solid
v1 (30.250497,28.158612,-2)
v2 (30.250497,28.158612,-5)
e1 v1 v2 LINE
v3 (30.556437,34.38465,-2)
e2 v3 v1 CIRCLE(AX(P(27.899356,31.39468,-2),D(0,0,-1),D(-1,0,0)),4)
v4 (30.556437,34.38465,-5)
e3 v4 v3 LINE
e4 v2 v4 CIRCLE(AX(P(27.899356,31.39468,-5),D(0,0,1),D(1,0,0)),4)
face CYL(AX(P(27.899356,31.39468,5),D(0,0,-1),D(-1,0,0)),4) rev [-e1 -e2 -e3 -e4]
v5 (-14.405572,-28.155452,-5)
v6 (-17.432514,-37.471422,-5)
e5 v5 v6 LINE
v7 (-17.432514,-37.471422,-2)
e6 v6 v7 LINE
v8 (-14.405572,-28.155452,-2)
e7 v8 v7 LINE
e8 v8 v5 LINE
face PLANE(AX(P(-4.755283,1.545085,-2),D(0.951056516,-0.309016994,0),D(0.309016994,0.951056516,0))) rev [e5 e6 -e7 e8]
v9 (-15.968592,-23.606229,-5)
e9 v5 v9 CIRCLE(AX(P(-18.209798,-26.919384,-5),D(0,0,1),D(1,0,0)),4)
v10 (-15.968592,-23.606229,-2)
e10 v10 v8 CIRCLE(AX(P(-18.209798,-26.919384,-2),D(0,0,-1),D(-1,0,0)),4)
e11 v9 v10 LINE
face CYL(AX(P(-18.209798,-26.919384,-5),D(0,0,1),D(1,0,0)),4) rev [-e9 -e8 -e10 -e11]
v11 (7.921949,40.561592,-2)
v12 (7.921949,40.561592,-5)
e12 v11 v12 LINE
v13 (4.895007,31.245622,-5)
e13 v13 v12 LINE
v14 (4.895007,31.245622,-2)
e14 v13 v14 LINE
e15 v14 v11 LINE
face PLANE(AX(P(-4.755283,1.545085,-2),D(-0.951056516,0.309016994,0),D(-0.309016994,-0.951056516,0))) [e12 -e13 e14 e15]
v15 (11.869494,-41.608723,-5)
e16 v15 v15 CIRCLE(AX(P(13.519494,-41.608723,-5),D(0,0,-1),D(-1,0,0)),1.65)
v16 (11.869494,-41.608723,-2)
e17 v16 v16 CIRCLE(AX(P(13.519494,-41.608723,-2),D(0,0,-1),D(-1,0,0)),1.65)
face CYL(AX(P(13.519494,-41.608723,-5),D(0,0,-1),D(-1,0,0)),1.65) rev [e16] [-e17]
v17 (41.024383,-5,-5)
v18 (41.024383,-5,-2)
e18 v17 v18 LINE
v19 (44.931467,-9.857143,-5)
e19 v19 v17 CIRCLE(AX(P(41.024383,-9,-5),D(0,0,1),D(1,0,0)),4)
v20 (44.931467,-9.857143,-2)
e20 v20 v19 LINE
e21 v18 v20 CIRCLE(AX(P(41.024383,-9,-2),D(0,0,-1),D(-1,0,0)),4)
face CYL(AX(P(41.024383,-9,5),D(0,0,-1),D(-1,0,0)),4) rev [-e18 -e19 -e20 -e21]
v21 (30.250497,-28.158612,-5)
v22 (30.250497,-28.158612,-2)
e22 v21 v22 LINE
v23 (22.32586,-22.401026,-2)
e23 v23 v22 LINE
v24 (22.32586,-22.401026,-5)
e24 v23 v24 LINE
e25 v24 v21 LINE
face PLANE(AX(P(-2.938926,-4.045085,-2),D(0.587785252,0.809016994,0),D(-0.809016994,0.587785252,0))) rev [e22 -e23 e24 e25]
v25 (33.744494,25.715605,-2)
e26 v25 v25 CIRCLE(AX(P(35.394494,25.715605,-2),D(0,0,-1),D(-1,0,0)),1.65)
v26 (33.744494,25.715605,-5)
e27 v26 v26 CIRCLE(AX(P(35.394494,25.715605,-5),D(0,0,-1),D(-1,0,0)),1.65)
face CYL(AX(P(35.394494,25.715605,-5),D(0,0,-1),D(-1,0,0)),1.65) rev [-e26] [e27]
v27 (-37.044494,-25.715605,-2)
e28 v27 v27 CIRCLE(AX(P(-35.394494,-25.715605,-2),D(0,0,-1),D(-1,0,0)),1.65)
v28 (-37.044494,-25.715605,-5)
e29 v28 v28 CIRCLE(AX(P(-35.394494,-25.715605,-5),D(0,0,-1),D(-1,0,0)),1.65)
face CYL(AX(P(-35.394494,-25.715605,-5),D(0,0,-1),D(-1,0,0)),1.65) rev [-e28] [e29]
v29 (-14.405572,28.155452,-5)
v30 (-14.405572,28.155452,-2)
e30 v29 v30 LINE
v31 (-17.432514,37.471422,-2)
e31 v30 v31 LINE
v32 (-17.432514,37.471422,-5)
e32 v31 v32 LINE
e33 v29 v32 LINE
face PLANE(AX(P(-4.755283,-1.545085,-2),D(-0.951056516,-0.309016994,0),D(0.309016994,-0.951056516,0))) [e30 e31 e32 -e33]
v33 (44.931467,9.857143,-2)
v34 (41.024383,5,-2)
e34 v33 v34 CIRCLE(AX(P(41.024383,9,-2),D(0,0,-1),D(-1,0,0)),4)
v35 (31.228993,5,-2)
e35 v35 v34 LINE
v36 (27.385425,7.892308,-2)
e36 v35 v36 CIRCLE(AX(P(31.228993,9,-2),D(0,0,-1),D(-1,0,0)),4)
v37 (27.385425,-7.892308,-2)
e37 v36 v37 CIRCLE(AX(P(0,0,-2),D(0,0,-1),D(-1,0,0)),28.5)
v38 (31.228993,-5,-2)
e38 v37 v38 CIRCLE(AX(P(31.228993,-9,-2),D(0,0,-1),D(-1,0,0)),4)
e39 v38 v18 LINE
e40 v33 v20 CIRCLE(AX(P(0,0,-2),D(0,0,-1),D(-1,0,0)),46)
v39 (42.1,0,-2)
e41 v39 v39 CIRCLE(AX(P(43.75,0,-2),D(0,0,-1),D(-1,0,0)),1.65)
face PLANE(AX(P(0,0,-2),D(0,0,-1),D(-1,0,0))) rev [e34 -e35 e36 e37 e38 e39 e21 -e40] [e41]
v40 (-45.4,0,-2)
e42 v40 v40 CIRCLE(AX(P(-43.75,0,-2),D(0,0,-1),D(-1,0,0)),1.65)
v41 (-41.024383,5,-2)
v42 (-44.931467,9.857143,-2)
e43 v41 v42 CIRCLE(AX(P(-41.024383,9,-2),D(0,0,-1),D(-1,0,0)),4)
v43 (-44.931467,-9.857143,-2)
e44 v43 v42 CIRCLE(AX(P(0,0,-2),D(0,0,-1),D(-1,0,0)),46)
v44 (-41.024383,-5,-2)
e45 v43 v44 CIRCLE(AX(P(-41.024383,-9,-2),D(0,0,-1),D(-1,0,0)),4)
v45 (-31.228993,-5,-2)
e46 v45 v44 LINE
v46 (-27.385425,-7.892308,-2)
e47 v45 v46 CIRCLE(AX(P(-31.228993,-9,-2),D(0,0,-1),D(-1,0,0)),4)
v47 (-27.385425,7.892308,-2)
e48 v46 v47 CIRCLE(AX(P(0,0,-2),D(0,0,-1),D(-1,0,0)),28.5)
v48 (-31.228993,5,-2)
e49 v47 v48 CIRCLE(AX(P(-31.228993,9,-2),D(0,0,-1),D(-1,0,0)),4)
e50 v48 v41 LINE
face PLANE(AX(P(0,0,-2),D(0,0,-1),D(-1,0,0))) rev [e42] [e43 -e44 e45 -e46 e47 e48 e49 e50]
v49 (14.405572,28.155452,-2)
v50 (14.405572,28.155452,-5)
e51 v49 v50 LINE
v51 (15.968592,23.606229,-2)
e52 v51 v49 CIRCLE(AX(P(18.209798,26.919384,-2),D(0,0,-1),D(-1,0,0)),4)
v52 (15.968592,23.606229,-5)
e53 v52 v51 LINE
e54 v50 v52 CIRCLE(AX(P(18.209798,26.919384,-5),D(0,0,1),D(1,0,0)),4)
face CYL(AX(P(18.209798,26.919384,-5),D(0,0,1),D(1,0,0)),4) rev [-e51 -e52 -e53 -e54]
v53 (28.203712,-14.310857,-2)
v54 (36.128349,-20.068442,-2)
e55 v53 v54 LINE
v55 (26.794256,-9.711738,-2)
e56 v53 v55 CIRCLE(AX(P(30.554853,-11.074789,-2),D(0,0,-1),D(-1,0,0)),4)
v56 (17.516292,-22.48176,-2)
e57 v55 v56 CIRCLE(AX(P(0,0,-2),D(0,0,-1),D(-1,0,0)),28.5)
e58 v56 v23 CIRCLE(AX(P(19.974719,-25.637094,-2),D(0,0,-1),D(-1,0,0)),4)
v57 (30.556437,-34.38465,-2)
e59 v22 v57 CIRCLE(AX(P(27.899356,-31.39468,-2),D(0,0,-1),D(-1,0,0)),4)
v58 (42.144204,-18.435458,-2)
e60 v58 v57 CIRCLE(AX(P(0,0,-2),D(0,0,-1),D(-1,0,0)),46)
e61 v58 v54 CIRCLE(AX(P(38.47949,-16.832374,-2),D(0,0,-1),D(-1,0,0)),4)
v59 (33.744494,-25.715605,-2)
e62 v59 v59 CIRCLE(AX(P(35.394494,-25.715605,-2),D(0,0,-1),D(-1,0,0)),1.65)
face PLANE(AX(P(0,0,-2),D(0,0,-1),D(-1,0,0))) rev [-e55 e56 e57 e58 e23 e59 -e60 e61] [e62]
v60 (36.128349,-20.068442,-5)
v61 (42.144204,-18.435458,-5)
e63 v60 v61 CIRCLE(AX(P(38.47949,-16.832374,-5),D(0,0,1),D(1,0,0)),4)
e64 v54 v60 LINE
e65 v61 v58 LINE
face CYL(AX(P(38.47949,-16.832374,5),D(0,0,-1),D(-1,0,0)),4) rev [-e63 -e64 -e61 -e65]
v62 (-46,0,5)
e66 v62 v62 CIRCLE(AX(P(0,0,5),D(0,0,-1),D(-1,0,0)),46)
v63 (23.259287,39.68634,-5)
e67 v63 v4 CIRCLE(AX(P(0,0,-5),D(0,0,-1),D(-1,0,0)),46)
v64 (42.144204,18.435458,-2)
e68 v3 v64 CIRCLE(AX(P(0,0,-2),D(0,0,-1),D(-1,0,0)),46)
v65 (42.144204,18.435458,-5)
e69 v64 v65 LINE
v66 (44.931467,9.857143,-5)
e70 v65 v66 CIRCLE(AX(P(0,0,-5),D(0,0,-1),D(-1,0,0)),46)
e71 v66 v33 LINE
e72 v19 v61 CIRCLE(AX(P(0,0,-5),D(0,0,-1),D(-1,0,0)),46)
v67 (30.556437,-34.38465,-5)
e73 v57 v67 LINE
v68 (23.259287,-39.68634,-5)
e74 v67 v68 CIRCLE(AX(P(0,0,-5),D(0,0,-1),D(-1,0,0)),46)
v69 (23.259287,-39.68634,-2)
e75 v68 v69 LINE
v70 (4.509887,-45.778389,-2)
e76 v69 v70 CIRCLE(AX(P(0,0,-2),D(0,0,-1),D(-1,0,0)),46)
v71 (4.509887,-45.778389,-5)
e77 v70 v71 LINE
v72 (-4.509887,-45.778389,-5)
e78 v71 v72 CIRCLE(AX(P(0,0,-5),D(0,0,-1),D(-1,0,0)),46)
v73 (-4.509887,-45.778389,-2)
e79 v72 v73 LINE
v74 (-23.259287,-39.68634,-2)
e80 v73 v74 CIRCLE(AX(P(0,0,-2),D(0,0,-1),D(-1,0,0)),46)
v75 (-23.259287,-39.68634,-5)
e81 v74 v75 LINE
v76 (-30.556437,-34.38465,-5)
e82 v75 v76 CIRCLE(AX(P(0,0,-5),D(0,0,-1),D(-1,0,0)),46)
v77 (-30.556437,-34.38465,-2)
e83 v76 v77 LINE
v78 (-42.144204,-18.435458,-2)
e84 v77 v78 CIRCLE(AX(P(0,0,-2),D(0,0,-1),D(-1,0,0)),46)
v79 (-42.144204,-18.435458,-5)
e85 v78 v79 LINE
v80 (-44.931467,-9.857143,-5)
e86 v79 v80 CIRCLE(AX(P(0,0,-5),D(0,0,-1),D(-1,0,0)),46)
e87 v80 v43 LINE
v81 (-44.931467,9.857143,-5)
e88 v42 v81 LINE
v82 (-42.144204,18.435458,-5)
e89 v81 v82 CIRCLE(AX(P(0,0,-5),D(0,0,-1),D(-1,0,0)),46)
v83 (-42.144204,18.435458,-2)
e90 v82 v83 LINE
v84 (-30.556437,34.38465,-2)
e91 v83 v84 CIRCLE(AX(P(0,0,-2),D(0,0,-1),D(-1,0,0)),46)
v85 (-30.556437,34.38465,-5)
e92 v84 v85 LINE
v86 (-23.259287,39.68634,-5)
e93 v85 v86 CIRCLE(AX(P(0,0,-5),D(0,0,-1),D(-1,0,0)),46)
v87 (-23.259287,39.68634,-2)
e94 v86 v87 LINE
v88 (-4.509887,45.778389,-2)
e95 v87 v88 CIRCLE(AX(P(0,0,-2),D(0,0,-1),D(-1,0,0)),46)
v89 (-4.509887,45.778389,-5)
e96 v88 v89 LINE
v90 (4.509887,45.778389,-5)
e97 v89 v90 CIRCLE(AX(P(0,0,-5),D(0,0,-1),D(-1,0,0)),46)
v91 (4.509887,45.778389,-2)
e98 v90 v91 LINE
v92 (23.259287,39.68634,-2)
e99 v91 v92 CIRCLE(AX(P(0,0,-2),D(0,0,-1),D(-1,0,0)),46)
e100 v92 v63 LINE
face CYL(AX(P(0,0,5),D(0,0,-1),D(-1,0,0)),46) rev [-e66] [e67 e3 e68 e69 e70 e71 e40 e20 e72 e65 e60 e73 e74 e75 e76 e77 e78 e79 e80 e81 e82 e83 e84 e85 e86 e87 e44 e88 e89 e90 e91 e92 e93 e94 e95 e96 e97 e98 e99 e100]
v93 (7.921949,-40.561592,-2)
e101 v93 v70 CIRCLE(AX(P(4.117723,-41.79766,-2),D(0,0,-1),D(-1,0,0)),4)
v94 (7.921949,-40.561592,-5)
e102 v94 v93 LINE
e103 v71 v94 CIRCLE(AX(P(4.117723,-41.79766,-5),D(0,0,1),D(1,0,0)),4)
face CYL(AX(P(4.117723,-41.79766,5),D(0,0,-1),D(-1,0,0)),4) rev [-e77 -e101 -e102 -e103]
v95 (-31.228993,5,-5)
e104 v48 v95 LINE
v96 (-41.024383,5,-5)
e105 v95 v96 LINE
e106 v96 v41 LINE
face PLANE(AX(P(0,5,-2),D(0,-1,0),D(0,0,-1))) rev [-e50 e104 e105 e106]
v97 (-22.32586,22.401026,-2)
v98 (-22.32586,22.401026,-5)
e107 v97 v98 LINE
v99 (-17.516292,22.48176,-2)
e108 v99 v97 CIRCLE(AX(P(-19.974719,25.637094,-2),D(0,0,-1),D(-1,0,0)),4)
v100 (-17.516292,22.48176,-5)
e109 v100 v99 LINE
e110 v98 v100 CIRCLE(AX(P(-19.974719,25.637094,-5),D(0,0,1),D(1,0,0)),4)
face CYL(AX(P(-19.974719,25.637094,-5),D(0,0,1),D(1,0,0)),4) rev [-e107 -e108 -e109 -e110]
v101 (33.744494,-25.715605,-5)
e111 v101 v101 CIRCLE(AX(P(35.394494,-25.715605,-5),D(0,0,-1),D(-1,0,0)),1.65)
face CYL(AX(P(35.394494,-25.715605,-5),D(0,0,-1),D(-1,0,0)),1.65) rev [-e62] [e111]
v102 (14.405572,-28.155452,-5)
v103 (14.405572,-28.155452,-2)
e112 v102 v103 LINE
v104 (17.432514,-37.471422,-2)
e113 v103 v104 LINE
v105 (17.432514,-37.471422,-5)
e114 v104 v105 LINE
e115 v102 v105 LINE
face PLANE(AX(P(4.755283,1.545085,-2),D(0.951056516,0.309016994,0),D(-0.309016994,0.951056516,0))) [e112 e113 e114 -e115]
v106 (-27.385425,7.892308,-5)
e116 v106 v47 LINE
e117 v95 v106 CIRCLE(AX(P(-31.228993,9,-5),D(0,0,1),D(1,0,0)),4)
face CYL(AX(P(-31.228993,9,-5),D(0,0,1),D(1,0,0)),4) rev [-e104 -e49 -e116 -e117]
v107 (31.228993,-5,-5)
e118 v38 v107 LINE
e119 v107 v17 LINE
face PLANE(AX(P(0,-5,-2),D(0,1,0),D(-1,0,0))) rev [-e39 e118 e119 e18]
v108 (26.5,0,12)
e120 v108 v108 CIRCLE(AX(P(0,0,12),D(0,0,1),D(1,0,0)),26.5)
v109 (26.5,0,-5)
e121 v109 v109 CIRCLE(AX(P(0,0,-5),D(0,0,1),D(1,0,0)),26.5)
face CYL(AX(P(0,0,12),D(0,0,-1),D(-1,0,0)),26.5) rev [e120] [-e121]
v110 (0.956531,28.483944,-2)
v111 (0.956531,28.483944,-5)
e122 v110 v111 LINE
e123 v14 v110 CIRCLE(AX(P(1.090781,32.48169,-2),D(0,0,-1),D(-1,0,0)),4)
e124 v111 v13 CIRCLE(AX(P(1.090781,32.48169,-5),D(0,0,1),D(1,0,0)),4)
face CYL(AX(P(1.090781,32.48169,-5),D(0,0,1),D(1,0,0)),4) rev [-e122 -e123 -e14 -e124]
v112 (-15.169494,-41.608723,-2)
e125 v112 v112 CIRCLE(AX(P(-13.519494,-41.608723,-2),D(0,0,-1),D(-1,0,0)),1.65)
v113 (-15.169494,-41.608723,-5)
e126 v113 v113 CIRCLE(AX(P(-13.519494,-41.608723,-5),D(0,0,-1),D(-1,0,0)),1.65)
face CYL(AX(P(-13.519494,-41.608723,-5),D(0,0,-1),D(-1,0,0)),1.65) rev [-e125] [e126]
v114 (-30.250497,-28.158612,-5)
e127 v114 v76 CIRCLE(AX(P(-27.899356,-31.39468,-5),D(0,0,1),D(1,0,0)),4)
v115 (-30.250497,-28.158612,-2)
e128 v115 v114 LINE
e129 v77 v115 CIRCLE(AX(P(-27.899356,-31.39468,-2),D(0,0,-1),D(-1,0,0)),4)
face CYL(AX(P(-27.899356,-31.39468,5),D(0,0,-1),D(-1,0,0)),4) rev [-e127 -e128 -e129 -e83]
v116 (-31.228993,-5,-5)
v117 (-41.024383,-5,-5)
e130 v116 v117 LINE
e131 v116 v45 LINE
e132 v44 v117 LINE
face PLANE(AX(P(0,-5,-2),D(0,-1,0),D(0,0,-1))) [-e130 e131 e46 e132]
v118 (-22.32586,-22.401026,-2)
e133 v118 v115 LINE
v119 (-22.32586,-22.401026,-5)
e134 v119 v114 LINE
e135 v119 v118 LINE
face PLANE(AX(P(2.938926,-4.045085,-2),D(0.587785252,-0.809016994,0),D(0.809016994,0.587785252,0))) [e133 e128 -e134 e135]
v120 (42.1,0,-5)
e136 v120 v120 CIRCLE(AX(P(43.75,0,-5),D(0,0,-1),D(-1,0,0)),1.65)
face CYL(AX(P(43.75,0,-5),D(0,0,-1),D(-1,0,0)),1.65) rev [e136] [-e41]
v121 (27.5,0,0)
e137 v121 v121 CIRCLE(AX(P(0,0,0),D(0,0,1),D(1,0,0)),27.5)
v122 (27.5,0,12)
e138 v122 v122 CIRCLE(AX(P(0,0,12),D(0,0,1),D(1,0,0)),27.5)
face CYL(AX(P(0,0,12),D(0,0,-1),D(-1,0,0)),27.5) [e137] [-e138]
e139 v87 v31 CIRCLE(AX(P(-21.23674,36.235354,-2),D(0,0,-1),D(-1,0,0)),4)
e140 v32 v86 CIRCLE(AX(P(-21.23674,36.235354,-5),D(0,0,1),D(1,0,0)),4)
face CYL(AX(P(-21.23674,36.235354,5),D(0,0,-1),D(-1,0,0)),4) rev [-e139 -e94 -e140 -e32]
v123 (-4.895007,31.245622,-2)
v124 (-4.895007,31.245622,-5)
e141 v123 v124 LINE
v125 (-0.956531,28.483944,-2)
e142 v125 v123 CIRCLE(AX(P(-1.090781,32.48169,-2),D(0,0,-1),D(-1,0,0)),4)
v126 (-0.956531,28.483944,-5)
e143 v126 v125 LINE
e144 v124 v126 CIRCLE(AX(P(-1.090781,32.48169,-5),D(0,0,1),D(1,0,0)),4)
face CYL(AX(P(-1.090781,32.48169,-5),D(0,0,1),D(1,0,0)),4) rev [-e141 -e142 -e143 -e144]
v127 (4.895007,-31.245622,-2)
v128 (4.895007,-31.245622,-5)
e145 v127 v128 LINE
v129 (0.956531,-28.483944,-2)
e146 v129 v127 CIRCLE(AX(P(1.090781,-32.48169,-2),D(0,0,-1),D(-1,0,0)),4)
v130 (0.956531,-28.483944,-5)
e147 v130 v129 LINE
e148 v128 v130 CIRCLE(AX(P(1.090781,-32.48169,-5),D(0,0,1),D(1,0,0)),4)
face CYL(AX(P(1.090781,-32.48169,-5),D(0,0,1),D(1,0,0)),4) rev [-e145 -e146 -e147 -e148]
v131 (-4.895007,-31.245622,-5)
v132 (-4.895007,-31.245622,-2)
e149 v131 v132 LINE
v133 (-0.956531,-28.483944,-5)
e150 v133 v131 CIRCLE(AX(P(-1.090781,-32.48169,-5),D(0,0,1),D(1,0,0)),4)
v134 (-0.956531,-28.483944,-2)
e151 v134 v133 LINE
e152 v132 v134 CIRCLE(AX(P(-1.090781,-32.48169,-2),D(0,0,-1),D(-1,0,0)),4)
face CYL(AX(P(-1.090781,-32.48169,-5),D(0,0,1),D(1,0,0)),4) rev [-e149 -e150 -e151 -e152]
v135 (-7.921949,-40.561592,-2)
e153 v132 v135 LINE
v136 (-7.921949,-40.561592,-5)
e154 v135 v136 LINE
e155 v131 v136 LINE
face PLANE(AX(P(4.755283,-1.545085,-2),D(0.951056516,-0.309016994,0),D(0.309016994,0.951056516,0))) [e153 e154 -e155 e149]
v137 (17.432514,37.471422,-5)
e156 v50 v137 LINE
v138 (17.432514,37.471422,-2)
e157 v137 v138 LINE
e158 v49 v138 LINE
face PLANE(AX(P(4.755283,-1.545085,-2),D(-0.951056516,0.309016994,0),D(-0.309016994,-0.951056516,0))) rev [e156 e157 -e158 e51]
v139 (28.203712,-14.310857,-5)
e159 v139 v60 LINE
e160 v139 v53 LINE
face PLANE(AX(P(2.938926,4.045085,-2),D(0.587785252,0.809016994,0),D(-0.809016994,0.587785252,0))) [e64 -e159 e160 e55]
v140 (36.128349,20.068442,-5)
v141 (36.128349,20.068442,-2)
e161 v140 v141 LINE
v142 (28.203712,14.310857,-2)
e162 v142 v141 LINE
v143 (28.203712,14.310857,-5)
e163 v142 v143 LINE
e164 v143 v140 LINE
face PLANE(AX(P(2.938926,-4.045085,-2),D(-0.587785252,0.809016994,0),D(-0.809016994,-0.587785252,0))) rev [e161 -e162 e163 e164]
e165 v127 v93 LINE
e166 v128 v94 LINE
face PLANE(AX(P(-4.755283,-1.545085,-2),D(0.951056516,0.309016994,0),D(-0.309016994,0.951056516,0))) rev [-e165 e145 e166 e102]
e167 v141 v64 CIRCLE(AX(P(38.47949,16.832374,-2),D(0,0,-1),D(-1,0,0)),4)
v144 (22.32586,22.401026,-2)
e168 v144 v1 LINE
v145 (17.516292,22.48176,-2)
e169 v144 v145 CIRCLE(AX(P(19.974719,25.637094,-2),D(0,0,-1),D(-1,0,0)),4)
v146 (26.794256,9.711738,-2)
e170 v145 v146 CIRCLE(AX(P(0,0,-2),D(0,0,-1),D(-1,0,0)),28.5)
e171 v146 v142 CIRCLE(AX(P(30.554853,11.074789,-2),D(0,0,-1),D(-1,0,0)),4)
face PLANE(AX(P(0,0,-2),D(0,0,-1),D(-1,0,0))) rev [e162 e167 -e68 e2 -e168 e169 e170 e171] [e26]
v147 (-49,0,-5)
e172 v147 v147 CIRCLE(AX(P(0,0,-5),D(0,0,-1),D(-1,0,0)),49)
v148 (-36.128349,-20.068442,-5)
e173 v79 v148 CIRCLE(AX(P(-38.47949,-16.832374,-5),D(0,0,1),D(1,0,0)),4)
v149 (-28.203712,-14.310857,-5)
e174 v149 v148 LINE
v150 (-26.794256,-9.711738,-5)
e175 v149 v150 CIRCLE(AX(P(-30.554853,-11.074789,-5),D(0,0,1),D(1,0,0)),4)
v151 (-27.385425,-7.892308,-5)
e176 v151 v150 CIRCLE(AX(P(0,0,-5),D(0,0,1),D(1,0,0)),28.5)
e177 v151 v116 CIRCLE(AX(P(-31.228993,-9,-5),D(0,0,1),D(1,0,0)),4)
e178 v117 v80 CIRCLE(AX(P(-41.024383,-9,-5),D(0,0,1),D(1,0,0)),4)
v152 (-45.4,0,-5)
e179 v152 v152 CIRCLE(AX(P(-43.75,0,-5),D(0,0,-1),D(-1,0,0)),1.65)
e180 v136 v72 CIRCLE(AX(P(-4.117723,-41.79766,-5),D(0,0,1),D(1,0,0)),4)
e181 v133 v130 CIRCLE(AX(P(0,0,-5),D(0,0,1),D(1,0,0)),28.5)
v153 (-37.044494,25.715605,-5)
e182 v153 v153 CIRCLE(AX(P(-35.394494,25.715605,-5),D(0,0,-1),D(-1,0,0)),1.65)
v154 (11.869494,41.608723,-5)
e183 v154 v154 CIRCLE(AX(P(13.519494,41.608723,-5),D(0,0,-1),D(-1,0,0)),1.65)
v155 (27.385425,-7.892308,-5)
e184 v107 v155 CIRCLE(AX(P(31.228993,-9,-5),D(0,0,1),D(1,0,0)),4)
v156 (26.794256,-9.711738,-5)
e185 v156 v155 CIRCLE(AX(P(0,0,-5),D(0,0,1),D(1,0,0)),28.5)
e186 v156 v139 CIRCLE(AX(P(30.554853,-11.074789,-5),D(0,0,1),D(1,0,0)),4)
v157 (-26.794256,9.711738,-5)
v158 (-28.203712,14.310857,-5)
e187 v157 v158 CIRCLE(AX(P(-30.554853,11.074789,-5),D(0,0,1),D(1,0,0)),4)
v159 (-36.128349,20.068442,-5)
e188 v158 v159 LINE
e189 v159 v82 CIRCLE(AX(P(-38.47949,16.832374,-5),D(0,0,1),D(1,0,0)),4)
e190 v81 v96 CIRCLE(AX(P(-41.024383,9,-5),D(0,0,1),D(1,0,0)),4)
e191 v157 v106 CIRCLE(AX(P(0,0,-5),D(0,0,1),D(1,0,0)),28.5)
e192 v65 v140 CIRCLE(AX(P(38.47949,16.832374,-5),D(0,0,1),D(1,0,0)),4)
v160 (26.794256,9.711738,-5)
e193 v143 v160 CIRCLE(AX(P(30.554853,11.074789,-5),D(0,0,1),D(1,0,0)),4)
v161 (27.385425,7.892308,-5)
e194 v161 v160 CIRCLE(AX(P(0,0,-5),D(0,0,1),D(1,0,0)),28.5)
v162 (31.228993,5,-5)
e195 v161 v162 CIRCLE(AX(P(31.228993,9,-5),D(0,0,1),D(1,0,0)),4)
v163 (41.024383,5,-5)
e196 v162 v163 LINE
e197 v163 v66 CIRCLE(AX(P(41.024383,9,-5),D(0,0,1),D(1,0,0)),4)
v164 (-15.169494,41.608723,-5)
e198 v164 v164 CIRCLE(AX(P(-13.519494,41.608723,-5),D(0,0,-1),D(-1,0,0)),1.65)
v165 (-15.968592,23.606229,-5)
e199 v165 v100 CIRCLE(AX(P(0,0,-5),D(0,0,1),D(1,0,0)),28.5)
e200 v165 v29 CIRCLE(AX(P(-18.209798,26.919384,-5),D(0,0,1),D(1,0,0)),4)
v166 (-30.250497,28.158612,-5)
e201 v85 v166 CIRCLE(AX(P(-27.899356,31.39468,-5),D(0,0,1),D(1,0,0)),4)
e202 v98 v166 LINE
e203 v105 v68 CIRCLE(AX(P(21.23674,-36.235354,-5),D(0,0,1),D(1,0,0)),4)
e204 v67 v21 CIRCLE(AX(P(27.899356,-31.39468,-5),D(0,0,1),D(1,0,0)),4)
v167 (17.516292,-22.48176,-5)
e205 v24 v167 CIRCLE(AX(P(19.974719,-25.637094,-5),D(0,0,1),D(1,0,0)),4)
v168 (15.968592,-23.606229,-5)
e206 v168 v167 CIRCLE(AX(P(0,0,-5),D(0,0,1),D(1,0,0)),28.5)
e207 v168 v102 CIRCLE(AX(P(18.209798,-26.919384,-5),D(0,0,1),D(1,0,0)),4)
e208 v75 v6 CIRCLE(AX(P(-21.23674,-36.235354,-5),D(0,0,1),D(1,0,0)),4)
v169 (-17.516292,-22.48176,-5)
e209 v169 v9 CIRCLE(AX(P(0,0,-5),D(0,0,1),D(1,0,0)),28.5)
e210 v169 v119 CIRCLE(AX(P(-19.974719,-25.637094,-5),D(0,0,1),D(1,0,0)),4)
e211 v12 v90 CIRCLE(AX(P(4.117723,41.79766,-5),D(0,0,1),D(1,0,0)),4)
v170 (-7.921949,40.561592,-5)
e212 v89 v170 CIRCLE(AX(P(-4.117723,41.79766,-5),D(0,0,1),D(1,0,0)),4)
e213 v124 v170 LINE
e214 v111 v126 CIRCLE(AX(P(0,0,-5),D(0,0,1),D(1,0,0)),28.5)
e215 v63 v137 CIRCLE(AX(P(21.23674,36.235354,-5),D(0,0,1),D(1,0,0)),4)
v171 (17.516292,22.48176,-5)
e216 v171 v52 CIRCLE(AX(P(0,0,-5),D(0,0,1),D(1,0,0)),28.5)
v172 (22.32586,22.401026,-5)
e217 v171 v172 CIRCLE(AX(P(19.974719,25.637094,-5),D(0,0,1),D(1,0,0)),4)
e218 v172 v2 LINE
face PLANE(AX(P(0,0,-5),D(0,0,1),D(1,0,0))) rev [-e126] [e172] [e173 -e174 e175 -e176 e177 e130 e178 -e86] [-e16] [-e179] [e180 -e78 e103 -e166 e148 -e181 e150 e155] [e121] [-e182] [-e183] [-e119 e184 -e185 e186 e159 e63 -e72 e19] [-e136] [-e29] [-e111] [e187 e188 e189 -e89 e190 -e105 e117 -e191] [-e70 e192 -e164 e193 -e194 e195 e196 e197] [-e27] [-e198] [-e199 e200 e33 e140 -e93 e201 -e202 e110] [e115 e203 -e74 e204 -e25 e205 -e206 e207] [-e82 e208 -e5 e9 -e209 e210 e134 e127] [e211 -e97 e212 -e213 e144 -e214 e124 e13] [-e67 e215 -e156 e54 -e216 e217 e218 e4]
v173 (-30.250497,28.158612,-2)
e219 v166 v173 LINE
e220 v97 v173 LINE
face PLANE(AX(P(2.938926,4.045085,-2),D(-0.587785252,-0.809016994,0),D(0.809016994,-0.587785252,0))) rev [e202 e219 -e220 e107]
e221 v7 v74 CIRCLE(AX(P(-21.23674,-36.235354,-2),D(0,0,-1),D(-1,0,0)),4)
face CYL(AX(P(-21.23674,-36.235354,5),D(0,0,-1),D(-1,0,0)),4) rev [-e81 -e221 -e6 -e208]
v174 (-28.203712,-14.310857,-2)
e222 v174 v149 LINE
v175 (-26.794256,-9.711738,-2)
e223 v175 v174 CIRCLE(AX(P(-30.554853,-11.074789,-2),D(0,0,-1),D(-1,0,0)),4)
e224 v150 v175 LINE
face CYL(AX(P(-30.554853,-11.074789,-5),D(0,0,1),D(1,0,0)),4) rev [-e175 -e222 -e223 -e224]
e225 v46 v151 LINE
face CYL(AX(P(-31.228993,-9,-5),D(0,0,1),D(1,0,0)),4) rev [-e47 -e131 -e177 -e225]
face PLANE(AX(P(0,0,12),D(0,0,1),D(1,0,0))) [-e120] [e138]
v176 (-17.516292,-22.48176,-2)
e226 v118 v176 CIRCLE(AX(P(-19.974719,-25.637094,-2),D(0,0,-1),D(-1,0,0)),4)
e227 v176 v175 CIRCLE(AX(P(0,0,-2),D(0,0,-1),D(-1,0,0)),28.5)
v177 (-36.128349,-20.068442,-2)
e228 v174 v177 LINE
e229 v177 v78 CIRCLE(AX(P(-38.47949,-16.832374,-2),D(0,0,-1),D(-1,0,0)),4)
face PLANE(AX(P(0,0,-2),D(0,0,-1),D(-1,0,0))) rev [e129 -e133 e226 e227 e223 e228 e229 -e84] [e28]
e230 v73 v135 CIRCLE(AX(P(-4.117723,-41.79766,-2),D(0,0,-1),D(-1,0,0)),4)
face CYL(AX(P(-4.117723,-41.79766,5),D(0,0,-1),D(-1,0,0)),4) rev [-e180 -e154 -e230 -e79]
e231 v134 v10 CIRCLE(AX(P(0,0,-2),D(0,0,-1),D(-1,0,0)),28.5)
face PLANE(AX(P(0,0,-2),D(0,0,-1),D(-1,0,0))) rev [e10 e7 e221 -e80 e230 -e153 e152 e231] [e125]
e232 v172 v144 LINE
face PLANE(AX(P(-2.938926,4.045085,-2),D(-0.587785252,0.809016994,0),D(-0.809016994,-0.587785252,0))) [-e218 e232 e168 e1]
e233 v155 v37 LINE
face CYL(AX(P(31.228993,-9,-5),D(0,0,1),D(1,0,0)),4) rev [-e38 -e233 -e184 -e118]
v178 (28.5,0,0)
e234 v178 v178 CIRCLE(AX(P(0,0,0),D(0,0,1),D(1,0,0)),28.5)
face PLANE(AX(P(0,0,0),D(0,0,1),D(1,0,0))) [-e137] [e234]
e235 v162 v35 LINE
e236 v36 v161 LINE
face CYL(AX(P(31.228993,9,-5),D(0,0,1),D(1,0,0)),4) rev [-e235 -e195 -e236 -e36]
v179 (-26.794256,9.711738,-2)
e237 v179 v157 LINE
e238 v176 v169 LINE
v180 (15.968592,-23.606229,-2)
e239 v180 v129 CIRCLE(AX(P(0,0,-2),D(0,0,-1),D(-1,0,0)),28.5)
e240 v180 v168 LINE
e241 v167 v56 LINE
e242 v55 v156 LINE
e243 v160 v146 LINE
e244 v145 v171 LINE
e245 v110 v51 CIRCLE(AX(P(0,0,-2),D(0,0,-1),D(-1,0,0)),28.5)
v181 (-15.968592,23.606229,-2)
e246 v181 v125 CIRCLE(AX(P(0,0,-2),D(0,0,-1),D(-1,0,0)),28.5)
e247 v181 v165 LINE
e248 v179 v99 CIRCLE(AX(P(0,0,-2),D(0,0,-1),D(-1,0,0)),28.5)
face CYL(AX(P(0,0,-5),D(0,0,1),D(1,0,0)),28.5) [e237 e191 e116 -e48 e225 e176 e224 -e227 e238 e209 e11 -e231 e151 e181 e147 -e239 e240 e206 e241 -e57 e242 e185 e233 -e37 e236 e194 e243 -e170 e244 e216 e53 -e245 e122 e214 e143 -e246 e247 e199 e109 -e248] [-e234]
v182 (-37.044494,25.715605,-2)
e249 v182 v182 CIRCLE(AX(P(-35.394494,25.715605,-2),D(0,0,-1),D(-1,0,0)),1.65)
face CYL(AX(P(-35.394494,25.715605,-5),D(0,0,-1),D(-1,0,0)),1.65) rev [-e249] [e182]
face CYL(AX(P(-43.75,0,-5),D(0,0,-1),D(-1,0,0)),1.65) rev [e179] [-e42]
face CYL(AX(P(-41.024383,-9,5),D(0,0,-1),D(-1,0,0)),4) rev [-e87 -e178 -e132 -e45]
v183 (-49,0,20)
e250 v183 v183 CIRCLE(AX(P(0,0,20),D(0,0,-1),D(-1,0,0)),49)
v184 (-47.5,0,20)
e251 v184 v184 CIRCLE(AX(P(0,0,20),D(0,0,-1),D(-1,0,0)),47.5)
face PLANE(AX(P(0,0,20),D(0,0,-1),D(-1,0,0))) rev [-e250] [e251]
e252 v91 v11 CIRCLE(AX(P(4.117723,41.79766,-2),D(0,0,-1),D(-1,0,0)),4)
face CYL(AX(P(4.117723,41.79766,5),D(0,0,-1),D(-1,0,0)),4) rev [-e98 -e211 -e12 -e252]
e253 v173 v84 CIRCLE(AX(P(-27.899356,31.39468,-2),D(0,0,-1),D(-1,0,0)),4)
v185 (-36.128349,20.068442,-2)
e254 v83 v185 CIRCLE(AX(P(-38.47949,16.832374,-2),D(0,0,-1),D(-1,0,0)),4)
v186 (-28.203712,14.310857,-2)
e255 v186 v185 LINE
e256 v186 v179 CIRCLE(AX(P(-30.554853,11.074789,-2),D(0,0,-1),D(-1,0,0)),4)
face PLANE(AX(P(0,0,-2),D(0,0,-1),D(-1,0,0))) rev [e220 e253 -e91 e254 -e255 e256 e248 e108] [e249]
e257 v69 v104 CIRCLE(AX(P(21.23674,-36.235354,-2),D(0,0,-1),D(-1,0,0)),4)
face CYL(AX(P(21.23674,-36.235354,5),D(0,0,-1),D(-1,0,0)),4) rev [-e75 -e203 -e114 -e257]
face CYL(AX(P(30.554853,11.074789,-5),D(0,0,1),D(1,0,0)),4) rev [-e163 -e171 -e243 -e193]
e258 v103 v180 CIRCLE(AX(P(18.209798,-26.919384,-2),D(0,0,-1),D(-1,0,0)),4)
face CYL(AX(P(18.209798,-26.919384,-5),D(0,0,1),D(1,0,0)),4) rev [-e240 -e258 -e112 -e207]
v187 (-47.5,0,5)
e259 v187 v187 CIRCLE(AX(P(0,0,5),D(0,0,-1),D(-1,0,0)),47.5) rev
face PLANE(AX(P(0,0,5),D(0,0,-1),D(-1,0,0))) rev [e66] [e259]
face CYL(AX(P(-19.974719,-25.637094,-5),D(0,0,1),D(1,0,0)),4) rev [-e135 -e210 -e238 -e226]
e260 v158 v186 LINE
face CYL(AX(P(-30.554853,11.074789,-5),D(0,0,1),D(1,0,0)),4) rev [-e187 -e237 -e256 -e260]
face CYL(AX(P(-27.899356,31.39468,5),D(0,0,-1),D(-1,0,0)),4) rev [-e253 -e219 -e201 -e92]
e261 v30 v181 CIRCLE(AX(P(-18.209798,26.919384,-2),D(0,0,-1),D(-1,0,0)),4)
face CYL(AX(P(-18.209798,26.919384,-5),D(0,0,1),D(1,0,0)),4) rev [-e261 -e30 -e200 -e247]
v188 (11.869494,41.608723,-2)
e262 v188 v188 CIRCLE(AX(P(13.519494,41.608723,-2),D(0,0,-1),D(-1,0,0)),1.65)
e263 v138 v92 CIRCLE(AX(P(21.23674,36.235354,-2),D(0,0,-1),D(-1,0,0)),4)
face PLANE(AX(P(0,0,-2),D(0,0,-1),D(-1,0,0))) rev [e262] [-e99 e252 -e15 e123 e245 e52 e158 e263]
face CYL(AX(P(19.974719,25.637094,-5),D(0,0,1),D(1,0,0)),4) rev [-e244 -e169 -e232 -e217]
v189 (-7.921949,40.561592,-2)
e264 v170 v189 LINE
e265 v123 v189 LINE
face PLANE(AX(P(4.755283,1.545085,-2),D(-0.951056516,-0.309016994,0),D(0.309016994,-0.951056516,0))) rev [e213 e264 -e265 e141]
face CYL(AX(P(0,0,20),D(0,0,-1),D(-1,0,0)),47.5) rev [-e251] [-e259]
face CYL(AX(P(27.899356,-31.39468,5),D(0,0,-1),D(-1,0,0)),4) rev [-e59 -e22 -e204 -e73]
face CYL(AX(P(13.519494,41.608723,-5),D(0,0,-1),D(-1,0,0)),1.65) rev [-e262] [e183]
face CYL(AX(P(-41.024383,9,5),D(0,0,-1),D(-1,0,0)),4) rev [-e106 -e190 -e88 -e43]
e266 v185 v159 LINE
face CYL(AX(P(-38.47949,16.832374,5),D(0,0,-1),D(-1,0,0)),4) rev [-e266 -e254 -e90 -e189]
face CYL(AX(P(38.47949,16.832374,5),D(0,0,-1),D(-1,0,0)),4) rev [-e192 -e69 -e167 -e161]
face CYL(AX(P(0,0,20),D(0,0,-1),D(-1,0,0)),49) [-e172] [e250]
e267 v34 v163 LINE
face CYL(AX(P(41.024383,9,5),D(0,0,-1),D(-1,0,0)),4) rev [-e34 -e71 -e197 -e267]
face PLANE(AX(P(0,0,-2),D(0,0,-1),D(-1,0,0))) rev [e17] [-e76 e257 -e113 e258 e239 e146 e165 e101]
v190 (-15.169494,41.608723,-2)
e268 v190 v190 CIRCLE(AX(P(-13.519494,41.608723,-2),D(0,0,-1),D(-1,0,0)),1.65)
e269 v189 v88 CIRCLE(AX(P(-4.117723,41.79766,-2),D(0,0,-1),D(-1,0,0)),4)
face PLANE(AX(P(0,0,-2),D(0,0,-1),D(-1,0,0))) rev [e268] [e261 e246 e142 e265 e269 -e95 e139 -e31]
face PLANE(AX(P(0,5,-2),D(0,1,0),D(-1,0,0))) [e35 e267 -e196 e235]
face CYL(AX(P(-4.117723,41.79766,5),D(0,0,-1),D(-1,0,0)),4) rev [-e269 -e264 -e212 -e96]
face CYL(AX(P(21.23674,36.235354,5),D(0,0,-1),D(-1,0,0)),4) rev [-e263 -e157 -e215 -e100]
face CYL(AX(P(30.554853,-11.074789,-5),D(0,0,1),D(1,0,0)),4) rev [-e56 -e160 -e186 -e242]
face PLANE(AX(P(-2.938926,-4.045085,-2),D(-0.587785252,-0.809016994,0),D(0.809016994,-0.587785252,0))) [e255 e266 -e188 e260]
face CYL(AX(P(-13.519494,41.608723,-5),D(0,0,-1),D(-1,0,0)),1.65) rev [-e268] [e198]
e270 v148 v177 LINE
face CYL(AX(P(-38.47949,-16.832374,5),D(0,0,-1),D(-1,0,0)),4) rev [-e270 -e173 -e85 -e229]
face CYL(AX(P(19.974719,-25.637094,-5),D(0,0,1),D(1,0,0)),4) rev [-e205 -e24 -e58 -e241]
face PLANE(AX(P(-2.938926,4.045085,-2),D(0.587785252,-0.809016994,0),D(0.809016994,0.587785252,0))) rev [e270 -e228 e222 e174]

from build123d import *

# Parameters (mm, degrees)
SKETCH1_R             = 27.5
SKETCH1_R_2           = 26.5
BOSS_EXTRUDE2_DEPTH   = 12
BOSS_EXTRUDE3_START   = -5
SKETCH1_3_R           = 28.5
SKETCH1_3_R_2         = 26.5
BOSS_EXTRUDE3_DEPTH   = 5
BOSS_EXTRUDE4_DEPTH   = 3
SKETCH3_3_R           = 49
BOSS_EXTRUDE5_DEPTH   = 25
SKETCH3_5_R           = 47.5
SKETCH3_5_R_2         = 46
BOSS_EXTRUDE6_DEPTH   = 10
FILLET1_R             = 4
M4X0_7_TAPPED_HOLE1_D = 3.3
CIRPATTERN1_COUNT     = 10


with BuildPart() as part:
    # Sketch1 → Boss-Extrude2 (new body)
    with BuildSketch(Plane.XY):
        Circle(SKETCH1_R)
        Circle(SKETCH1_R_2, mode=Mode.SUBTRACT)
    extrude(amount=BOSS_EXTRUDE2_DEPTH)

    # Sketch1<3> → Boss-Extrude3 (add)
    with BuildSketch(Plane.XY.offset(BOSS_EXTRUDE3_START)):
        Circle(SKETCH1_3_R)
        Circle(SKETCH1_3_R_2, mode=Mode.SUBTRACT)
    extrude(amount=BOSS_EXTRUDE3_DEPTH)

    # Sketch3 → Boss-Extrude4 (add)
    with BuildSketch(Plane(origin=(0, 0, -5), x_dir=(-1, 0, 0), z_dir=(0, 0, -1))):
        with BuildLine():
            ThreePointArc((28.057975693, 5), (28.5, 0), (28.057975693, -5))
            Line((28.057975693, -5), (47.236109069, -5))
            ThreePointArc((47.236109069, -5), (47.5, 0), (47.236109069, 5))
            Line((47.236109069, 5), (28.057975693, 5))
        make_face()
        with BuildLine():
            ThreePointArc((19.760452902, 20.537149294), (23.05698434, 16.75187969), (25.638305425, 12.44697935))
            Line((25.638305425, 12.44697935), (41.153741247, 23.719603315))
            ThreePointArc((41.153741247, 23.719603315), (38.428307233, 27.919799484), (35.275888724, 31.809773258))
            Line((35.275888724, 31.809773258), (19.760452902, 20.537149294))
        make_face()
        with BuildLine():
            ThreePointArc((25.638305425, -12.44697935), (23.05698434, -16.75187969), (19.760452902, -20.537149294))
            Line((19.760452902, -20.537149294), (35.275888724, -31.809773258))
            ThreePointArc((35.275888724, -31.809773258), (38.428307233, -27.919799484), (41.153741247, -23.719603315))
            Line((41.153741247, -23.719603315), (25.638305425, -12.44697935))
        make_face()
        with BuildLine():
            ThreePointArc((3.915108735, 28.229805589), (8.80698434, 27.105110714), (13.425673898, 25.139635645))
            Line((13.425673898, 25.139635645), (19.352043032, 43.379124363))
            ThreePointArc((19.352043032, 43.379124363), (14.678307233, 45.175184524), (9.841477869, 46.469294307))
            Line((9.841477869, 46.469294307), (3.915108735, 28.229805589))
        make_face()
        with BuildLine():
            ThreePointArc((13.425673898, -25.139635645), (8.80698434, -27.105110714), (3.915108735, -28.229805589))
            Line((3.915108735, -28.229805589), (9.841477869, -46.469294307))
            ThreePointArc((9.841477869, -46.469294307), (14.678307233, -45.175184524), (19.352043032, -43.379124363))
            Line((19.352043032, -43.379124363), (13.425673898, -25.139635645))
        make_face()
        with BuildLine():
            ThreePointArc((-13.425673898, 25.139635645), (-8.80698434, 27.105110714), (-3.915108735, 28.229805589))
            Line((-3.915108735, 28.229805589), (-9.841477869, 46.469294307))
            ThreePointArc((-9.841477869, 46.469294307), (-14.678307233, 45.175184524), (-19.352043032, 43.379124363))
            Line((-19.352043032, 43.379124363), (-13.425673898, 25.139635645))
        make_face()
        with BuildLine():
            ThreePointArc((-3.915108735, -28.229805589), (-8.80698434, -27.105110714), (-13.425673898, -25.139635645))
            Line((-13.425673898, -25.139635645), (-19.352043032, -43.379124363))
            ThreePointArc((-19.352043032, -43.379124363), (-14.678307233, -45.175184524), (-9.841477869, -46.469294307))
            Line((-9.841477869, -46.469294307), (-3.915108735, -28.229805589))
        make_face()
        with BuildLine():
            ThreePointArc((-25.638305425, 12.44697935), (-23.05698434, 16.75187969), (-19.760452902, 20.537149294))
            Line((-19.760452902, 20.537149294), (-35.275888724, 31.809773258))
            ThreePointArc((-35.275888724, 31.809773258), (-38.428307233, 27.919799484), (-41.153741247, 23.719603315))
            Line((-41.153741247, 23.719603315), (-25.638305425, 12.44697935))
        make_face()
        with BuildLine():
            ThreePointArc((-19.760452902, -20.537149294), (-23.05698434, -16.75187969), (-25.638305425, -12.44697935))
            Line((-25.638305425, -12.44697935), (-41.153741247, -23.719603315))
            ThreePointArc((-41.153741247, -23.719603315), (-38.428307233, -27.919799484), (-35.275888724, -31.809773258))
            Line((-35.275888724, -31.809773258), (-19.760452902, -20.537149294))
        make_face()
        with BuildLine():
            ThreePointArc((-28.057975693, -5), (-28.5, 0), (-28.057975693, 5))
            Line((-28.057975693, 5), (-47.236109069, 5))
            ThreePointArc((-47.236109069, 5), (-47.5, 0), (-47.236109069, -5))
            Line((-47.236109069, -5), (-28.057975693, -5))
        make_face()
    extrude(amount=-BOSS_EXTRUDE4_DEPTH)

    # Sketch3<3> → Boss-Extrude5 (add)
    with BuildSketch(Plane(origin=(0, 0, -5), x_dir=(-1, 0, 0), z_dir=(0, 0, -1))):
        Circle(SKETCH3_3_R)
        with BuildLine():
            ThreePointArc((41.153741247, 23.719603315), (45.175184524, 14.678307233), (47.236109069, 5))
            ThreePointArc((47.236109069, 5), (47.433981389, 2.5034795), (47.5, 0))
            ThreePointArc((47.5, 0), (47.433981389, -2.5034795), (47.236109069, -5))
            ThreePointArc((47.236109069, -5), (45.175184524, -14.678307233), (41.153741247, -23.719603315))
            ThreePointArc((41.153741247, -23.719603315), (38.428307233, -27.919799484), (35.275888724, -31.809773258))
            ThreePointArc((35.275888724, -31.809773258), (27.919799484, -38.428307233), (19.352043032, -43.379124363))
            ThreePointArc((19.352043032, -43.379124363), (14.678307233, -45.175184524), (9.841477869, -46.469294307))
            ThreePointArc((9.841477869, -46.469294307), (0, -47.5), (-9.841477869, -46.469294307))
            ThreePointArc((-9.841477869, -46.469294307), (-14.678307233, -45.175184524), (-19.352043032, -43.379124363))
            ThreePointArc((-19.352043032, -43.379124363), (-27.919799484, -38.428307233), (-35.275888724, -31.809773258))
            ThreePointArc((-35.275888724, -31.809773258), (-38.428307233, -27.919799484), (-41.153741247, -23.719603315))
            ThreePointArc((-41.153741247, -23.719603315), (-45.175184524, -14.678307233), (-47.236109069, -5))
            ThreePointArc((-47.236109069, -5), (-47.5, 0), (-47.236109069, 5))
            ThreePointArc((-47.236109069, 5), (-45.175184524, 14.678307233), (-41.153741247, 23.719603315))
            ThreePointArc((-41.153741247, 23.719603315), (-38.428307233, 27.919799484), (-35.275888724, 31.809773258))
            ThreePointArc((-35.275888724, 31.809773258), (-27.919799484, 38.428307233), (-19.352043032, 43.379124363))
            ThreePointArc((-19.352043032, 43.379124363), (-14.678307233, 45.175184524), (-9.841477869, 46.469294307))
            ThreePointArc((-9.841477869, 46.469294307), (0, 47.5), (9.841477869, 46.469294307))
            ThreePointArc((9.841477869, 46.469294307), (14.678307233, 45.175184524), (19.352043032, 43.379124363))
            ThreePointArc((19.352043032, 43.379124363), (27.919799484, 38.428307233), (35.275888724, 31.809773258))
            ThreePointArc((35.275888724, 31.809773258), (38.428307233, 27.919799484), (41.153741247, 23.719603315))
        make_face(mode=Mode.SUBTRACT)
    extrude(amount=-BOSS_EXTRUDE5_DEPTH)

    # Sketch3<5> → Boss-Extrude6 (add)
    with BuildSketch(Plane(origin=(0, 0, -5), x_dir=(-1, 0, 0), z_dir=(0, 0, -1))):
        Circle(SKETCH3_5_R)
        Circle(SKETCH3_5_R_2, mode=Mode.SUBTRACT)
    extrude(amount=-BOSS_EXTRUDE6_DEPTH)

    # Fillet1
    fillet1_edges = [part.edges().sort_by_distance(p)[0] for p in [
        (-34.055360698, 30.923007741, -3.5),
        (-18.88584281, 41.944307616, -3.5),
        (-13.425673898, 25.139635645, -3.5),
        (-19.760452902, 20.537149294, -3.5),
        (-39.933213221, 22.832837797, -3.5),
        (-45.727453461, 5, -3.5),
        (-25.638305425, 12.44697935, -3.5),
        (-28.057975693, 5, -3.5),
        (-39.933213221, -22.832837797, -3.5),
        (-45.727453461, -5, -3.5),
        (-28.057975693, -5, -3.5),
        (-25.638305425, -12.44697935, -3.5),
        (-19.760452902, -20.537149294, -3.5),
        (-13.425673898, -25.139635645, -3.5),
        (-18.88584281, -41.944307616, -3.5),
        (-34.055360698, -30.923007741, -3.5),
        (-9.375277647, -45.034477559, -3.5),
        (-3.915108735, -28.229805589, -3.5),
        (3.915108735, -28.229805589, -3.5),
        (9.375277647, -45.034477559, -3.5),
        (18.88584281, -41.944307615, -3.5),
        (34.055360698, -30.923007741, -3.5),
        (19.760452902, -20.537149294, -3.5),
        (13.425673898, -25.139635645, -3.5),
        (28.057975693, -5, -3.5),
        (25.638305425, -12.44697935, -3.5),
        (45.727453461, -5, -3.5),
        (39.933213221, -22.832837797, -3.5),
        (28.057975693, 5, -3.5),
        (25.638305425, 12.44697935, -3.5),
        (39.933213221, 22.832837797, -3.5),
        (45.727453461, 5, -3.5),
        (19.760452902, 20.537149294, -3.5),
        (13.425673898, 25.139635645, -3.5),
        (18.88584281, 41.944307615, -3.5),
        (34.055360698, 30.923007741, -3.5),
        (-3.915108735, 28.229805589, -3.5),
        (3.915108735, 28.229805589, -3.5),
        (-9.375277647, 45.034477559, -3.5),
        (9.375277647, 45.034477559, -3.5),
    ]]
    fillet(fillet1_edges, radius=FILLET1_R)

    # M4x0.7 Tapped Hole1 (through all)
    with Locations(Plane(origin=(0, 0, -5), x_dir=(-1, 0, 0), z_dir=(0, 0, -1))):
        with Locations((43.75, 0)):
            m4x0_7_tapped_hole1 = Hole(M4X0_7_TAPPED_HOLE1_D / 2)

    # CirPattern1: M4x0.7 Tapped Hole1 ×10 about axis
    cirpattern1_axis = Axis((0, 0, 1000), (0, 0, -1))
    for i in range(1, CIRPATTERN1_COUNT):
        add(m4x0_7_tapped_hole1.rotate(cirpattern1_axis, i * 360 / CIRPATTERN1_COUNT), mode=Mode.SUBTRACT)


solid = part.part
